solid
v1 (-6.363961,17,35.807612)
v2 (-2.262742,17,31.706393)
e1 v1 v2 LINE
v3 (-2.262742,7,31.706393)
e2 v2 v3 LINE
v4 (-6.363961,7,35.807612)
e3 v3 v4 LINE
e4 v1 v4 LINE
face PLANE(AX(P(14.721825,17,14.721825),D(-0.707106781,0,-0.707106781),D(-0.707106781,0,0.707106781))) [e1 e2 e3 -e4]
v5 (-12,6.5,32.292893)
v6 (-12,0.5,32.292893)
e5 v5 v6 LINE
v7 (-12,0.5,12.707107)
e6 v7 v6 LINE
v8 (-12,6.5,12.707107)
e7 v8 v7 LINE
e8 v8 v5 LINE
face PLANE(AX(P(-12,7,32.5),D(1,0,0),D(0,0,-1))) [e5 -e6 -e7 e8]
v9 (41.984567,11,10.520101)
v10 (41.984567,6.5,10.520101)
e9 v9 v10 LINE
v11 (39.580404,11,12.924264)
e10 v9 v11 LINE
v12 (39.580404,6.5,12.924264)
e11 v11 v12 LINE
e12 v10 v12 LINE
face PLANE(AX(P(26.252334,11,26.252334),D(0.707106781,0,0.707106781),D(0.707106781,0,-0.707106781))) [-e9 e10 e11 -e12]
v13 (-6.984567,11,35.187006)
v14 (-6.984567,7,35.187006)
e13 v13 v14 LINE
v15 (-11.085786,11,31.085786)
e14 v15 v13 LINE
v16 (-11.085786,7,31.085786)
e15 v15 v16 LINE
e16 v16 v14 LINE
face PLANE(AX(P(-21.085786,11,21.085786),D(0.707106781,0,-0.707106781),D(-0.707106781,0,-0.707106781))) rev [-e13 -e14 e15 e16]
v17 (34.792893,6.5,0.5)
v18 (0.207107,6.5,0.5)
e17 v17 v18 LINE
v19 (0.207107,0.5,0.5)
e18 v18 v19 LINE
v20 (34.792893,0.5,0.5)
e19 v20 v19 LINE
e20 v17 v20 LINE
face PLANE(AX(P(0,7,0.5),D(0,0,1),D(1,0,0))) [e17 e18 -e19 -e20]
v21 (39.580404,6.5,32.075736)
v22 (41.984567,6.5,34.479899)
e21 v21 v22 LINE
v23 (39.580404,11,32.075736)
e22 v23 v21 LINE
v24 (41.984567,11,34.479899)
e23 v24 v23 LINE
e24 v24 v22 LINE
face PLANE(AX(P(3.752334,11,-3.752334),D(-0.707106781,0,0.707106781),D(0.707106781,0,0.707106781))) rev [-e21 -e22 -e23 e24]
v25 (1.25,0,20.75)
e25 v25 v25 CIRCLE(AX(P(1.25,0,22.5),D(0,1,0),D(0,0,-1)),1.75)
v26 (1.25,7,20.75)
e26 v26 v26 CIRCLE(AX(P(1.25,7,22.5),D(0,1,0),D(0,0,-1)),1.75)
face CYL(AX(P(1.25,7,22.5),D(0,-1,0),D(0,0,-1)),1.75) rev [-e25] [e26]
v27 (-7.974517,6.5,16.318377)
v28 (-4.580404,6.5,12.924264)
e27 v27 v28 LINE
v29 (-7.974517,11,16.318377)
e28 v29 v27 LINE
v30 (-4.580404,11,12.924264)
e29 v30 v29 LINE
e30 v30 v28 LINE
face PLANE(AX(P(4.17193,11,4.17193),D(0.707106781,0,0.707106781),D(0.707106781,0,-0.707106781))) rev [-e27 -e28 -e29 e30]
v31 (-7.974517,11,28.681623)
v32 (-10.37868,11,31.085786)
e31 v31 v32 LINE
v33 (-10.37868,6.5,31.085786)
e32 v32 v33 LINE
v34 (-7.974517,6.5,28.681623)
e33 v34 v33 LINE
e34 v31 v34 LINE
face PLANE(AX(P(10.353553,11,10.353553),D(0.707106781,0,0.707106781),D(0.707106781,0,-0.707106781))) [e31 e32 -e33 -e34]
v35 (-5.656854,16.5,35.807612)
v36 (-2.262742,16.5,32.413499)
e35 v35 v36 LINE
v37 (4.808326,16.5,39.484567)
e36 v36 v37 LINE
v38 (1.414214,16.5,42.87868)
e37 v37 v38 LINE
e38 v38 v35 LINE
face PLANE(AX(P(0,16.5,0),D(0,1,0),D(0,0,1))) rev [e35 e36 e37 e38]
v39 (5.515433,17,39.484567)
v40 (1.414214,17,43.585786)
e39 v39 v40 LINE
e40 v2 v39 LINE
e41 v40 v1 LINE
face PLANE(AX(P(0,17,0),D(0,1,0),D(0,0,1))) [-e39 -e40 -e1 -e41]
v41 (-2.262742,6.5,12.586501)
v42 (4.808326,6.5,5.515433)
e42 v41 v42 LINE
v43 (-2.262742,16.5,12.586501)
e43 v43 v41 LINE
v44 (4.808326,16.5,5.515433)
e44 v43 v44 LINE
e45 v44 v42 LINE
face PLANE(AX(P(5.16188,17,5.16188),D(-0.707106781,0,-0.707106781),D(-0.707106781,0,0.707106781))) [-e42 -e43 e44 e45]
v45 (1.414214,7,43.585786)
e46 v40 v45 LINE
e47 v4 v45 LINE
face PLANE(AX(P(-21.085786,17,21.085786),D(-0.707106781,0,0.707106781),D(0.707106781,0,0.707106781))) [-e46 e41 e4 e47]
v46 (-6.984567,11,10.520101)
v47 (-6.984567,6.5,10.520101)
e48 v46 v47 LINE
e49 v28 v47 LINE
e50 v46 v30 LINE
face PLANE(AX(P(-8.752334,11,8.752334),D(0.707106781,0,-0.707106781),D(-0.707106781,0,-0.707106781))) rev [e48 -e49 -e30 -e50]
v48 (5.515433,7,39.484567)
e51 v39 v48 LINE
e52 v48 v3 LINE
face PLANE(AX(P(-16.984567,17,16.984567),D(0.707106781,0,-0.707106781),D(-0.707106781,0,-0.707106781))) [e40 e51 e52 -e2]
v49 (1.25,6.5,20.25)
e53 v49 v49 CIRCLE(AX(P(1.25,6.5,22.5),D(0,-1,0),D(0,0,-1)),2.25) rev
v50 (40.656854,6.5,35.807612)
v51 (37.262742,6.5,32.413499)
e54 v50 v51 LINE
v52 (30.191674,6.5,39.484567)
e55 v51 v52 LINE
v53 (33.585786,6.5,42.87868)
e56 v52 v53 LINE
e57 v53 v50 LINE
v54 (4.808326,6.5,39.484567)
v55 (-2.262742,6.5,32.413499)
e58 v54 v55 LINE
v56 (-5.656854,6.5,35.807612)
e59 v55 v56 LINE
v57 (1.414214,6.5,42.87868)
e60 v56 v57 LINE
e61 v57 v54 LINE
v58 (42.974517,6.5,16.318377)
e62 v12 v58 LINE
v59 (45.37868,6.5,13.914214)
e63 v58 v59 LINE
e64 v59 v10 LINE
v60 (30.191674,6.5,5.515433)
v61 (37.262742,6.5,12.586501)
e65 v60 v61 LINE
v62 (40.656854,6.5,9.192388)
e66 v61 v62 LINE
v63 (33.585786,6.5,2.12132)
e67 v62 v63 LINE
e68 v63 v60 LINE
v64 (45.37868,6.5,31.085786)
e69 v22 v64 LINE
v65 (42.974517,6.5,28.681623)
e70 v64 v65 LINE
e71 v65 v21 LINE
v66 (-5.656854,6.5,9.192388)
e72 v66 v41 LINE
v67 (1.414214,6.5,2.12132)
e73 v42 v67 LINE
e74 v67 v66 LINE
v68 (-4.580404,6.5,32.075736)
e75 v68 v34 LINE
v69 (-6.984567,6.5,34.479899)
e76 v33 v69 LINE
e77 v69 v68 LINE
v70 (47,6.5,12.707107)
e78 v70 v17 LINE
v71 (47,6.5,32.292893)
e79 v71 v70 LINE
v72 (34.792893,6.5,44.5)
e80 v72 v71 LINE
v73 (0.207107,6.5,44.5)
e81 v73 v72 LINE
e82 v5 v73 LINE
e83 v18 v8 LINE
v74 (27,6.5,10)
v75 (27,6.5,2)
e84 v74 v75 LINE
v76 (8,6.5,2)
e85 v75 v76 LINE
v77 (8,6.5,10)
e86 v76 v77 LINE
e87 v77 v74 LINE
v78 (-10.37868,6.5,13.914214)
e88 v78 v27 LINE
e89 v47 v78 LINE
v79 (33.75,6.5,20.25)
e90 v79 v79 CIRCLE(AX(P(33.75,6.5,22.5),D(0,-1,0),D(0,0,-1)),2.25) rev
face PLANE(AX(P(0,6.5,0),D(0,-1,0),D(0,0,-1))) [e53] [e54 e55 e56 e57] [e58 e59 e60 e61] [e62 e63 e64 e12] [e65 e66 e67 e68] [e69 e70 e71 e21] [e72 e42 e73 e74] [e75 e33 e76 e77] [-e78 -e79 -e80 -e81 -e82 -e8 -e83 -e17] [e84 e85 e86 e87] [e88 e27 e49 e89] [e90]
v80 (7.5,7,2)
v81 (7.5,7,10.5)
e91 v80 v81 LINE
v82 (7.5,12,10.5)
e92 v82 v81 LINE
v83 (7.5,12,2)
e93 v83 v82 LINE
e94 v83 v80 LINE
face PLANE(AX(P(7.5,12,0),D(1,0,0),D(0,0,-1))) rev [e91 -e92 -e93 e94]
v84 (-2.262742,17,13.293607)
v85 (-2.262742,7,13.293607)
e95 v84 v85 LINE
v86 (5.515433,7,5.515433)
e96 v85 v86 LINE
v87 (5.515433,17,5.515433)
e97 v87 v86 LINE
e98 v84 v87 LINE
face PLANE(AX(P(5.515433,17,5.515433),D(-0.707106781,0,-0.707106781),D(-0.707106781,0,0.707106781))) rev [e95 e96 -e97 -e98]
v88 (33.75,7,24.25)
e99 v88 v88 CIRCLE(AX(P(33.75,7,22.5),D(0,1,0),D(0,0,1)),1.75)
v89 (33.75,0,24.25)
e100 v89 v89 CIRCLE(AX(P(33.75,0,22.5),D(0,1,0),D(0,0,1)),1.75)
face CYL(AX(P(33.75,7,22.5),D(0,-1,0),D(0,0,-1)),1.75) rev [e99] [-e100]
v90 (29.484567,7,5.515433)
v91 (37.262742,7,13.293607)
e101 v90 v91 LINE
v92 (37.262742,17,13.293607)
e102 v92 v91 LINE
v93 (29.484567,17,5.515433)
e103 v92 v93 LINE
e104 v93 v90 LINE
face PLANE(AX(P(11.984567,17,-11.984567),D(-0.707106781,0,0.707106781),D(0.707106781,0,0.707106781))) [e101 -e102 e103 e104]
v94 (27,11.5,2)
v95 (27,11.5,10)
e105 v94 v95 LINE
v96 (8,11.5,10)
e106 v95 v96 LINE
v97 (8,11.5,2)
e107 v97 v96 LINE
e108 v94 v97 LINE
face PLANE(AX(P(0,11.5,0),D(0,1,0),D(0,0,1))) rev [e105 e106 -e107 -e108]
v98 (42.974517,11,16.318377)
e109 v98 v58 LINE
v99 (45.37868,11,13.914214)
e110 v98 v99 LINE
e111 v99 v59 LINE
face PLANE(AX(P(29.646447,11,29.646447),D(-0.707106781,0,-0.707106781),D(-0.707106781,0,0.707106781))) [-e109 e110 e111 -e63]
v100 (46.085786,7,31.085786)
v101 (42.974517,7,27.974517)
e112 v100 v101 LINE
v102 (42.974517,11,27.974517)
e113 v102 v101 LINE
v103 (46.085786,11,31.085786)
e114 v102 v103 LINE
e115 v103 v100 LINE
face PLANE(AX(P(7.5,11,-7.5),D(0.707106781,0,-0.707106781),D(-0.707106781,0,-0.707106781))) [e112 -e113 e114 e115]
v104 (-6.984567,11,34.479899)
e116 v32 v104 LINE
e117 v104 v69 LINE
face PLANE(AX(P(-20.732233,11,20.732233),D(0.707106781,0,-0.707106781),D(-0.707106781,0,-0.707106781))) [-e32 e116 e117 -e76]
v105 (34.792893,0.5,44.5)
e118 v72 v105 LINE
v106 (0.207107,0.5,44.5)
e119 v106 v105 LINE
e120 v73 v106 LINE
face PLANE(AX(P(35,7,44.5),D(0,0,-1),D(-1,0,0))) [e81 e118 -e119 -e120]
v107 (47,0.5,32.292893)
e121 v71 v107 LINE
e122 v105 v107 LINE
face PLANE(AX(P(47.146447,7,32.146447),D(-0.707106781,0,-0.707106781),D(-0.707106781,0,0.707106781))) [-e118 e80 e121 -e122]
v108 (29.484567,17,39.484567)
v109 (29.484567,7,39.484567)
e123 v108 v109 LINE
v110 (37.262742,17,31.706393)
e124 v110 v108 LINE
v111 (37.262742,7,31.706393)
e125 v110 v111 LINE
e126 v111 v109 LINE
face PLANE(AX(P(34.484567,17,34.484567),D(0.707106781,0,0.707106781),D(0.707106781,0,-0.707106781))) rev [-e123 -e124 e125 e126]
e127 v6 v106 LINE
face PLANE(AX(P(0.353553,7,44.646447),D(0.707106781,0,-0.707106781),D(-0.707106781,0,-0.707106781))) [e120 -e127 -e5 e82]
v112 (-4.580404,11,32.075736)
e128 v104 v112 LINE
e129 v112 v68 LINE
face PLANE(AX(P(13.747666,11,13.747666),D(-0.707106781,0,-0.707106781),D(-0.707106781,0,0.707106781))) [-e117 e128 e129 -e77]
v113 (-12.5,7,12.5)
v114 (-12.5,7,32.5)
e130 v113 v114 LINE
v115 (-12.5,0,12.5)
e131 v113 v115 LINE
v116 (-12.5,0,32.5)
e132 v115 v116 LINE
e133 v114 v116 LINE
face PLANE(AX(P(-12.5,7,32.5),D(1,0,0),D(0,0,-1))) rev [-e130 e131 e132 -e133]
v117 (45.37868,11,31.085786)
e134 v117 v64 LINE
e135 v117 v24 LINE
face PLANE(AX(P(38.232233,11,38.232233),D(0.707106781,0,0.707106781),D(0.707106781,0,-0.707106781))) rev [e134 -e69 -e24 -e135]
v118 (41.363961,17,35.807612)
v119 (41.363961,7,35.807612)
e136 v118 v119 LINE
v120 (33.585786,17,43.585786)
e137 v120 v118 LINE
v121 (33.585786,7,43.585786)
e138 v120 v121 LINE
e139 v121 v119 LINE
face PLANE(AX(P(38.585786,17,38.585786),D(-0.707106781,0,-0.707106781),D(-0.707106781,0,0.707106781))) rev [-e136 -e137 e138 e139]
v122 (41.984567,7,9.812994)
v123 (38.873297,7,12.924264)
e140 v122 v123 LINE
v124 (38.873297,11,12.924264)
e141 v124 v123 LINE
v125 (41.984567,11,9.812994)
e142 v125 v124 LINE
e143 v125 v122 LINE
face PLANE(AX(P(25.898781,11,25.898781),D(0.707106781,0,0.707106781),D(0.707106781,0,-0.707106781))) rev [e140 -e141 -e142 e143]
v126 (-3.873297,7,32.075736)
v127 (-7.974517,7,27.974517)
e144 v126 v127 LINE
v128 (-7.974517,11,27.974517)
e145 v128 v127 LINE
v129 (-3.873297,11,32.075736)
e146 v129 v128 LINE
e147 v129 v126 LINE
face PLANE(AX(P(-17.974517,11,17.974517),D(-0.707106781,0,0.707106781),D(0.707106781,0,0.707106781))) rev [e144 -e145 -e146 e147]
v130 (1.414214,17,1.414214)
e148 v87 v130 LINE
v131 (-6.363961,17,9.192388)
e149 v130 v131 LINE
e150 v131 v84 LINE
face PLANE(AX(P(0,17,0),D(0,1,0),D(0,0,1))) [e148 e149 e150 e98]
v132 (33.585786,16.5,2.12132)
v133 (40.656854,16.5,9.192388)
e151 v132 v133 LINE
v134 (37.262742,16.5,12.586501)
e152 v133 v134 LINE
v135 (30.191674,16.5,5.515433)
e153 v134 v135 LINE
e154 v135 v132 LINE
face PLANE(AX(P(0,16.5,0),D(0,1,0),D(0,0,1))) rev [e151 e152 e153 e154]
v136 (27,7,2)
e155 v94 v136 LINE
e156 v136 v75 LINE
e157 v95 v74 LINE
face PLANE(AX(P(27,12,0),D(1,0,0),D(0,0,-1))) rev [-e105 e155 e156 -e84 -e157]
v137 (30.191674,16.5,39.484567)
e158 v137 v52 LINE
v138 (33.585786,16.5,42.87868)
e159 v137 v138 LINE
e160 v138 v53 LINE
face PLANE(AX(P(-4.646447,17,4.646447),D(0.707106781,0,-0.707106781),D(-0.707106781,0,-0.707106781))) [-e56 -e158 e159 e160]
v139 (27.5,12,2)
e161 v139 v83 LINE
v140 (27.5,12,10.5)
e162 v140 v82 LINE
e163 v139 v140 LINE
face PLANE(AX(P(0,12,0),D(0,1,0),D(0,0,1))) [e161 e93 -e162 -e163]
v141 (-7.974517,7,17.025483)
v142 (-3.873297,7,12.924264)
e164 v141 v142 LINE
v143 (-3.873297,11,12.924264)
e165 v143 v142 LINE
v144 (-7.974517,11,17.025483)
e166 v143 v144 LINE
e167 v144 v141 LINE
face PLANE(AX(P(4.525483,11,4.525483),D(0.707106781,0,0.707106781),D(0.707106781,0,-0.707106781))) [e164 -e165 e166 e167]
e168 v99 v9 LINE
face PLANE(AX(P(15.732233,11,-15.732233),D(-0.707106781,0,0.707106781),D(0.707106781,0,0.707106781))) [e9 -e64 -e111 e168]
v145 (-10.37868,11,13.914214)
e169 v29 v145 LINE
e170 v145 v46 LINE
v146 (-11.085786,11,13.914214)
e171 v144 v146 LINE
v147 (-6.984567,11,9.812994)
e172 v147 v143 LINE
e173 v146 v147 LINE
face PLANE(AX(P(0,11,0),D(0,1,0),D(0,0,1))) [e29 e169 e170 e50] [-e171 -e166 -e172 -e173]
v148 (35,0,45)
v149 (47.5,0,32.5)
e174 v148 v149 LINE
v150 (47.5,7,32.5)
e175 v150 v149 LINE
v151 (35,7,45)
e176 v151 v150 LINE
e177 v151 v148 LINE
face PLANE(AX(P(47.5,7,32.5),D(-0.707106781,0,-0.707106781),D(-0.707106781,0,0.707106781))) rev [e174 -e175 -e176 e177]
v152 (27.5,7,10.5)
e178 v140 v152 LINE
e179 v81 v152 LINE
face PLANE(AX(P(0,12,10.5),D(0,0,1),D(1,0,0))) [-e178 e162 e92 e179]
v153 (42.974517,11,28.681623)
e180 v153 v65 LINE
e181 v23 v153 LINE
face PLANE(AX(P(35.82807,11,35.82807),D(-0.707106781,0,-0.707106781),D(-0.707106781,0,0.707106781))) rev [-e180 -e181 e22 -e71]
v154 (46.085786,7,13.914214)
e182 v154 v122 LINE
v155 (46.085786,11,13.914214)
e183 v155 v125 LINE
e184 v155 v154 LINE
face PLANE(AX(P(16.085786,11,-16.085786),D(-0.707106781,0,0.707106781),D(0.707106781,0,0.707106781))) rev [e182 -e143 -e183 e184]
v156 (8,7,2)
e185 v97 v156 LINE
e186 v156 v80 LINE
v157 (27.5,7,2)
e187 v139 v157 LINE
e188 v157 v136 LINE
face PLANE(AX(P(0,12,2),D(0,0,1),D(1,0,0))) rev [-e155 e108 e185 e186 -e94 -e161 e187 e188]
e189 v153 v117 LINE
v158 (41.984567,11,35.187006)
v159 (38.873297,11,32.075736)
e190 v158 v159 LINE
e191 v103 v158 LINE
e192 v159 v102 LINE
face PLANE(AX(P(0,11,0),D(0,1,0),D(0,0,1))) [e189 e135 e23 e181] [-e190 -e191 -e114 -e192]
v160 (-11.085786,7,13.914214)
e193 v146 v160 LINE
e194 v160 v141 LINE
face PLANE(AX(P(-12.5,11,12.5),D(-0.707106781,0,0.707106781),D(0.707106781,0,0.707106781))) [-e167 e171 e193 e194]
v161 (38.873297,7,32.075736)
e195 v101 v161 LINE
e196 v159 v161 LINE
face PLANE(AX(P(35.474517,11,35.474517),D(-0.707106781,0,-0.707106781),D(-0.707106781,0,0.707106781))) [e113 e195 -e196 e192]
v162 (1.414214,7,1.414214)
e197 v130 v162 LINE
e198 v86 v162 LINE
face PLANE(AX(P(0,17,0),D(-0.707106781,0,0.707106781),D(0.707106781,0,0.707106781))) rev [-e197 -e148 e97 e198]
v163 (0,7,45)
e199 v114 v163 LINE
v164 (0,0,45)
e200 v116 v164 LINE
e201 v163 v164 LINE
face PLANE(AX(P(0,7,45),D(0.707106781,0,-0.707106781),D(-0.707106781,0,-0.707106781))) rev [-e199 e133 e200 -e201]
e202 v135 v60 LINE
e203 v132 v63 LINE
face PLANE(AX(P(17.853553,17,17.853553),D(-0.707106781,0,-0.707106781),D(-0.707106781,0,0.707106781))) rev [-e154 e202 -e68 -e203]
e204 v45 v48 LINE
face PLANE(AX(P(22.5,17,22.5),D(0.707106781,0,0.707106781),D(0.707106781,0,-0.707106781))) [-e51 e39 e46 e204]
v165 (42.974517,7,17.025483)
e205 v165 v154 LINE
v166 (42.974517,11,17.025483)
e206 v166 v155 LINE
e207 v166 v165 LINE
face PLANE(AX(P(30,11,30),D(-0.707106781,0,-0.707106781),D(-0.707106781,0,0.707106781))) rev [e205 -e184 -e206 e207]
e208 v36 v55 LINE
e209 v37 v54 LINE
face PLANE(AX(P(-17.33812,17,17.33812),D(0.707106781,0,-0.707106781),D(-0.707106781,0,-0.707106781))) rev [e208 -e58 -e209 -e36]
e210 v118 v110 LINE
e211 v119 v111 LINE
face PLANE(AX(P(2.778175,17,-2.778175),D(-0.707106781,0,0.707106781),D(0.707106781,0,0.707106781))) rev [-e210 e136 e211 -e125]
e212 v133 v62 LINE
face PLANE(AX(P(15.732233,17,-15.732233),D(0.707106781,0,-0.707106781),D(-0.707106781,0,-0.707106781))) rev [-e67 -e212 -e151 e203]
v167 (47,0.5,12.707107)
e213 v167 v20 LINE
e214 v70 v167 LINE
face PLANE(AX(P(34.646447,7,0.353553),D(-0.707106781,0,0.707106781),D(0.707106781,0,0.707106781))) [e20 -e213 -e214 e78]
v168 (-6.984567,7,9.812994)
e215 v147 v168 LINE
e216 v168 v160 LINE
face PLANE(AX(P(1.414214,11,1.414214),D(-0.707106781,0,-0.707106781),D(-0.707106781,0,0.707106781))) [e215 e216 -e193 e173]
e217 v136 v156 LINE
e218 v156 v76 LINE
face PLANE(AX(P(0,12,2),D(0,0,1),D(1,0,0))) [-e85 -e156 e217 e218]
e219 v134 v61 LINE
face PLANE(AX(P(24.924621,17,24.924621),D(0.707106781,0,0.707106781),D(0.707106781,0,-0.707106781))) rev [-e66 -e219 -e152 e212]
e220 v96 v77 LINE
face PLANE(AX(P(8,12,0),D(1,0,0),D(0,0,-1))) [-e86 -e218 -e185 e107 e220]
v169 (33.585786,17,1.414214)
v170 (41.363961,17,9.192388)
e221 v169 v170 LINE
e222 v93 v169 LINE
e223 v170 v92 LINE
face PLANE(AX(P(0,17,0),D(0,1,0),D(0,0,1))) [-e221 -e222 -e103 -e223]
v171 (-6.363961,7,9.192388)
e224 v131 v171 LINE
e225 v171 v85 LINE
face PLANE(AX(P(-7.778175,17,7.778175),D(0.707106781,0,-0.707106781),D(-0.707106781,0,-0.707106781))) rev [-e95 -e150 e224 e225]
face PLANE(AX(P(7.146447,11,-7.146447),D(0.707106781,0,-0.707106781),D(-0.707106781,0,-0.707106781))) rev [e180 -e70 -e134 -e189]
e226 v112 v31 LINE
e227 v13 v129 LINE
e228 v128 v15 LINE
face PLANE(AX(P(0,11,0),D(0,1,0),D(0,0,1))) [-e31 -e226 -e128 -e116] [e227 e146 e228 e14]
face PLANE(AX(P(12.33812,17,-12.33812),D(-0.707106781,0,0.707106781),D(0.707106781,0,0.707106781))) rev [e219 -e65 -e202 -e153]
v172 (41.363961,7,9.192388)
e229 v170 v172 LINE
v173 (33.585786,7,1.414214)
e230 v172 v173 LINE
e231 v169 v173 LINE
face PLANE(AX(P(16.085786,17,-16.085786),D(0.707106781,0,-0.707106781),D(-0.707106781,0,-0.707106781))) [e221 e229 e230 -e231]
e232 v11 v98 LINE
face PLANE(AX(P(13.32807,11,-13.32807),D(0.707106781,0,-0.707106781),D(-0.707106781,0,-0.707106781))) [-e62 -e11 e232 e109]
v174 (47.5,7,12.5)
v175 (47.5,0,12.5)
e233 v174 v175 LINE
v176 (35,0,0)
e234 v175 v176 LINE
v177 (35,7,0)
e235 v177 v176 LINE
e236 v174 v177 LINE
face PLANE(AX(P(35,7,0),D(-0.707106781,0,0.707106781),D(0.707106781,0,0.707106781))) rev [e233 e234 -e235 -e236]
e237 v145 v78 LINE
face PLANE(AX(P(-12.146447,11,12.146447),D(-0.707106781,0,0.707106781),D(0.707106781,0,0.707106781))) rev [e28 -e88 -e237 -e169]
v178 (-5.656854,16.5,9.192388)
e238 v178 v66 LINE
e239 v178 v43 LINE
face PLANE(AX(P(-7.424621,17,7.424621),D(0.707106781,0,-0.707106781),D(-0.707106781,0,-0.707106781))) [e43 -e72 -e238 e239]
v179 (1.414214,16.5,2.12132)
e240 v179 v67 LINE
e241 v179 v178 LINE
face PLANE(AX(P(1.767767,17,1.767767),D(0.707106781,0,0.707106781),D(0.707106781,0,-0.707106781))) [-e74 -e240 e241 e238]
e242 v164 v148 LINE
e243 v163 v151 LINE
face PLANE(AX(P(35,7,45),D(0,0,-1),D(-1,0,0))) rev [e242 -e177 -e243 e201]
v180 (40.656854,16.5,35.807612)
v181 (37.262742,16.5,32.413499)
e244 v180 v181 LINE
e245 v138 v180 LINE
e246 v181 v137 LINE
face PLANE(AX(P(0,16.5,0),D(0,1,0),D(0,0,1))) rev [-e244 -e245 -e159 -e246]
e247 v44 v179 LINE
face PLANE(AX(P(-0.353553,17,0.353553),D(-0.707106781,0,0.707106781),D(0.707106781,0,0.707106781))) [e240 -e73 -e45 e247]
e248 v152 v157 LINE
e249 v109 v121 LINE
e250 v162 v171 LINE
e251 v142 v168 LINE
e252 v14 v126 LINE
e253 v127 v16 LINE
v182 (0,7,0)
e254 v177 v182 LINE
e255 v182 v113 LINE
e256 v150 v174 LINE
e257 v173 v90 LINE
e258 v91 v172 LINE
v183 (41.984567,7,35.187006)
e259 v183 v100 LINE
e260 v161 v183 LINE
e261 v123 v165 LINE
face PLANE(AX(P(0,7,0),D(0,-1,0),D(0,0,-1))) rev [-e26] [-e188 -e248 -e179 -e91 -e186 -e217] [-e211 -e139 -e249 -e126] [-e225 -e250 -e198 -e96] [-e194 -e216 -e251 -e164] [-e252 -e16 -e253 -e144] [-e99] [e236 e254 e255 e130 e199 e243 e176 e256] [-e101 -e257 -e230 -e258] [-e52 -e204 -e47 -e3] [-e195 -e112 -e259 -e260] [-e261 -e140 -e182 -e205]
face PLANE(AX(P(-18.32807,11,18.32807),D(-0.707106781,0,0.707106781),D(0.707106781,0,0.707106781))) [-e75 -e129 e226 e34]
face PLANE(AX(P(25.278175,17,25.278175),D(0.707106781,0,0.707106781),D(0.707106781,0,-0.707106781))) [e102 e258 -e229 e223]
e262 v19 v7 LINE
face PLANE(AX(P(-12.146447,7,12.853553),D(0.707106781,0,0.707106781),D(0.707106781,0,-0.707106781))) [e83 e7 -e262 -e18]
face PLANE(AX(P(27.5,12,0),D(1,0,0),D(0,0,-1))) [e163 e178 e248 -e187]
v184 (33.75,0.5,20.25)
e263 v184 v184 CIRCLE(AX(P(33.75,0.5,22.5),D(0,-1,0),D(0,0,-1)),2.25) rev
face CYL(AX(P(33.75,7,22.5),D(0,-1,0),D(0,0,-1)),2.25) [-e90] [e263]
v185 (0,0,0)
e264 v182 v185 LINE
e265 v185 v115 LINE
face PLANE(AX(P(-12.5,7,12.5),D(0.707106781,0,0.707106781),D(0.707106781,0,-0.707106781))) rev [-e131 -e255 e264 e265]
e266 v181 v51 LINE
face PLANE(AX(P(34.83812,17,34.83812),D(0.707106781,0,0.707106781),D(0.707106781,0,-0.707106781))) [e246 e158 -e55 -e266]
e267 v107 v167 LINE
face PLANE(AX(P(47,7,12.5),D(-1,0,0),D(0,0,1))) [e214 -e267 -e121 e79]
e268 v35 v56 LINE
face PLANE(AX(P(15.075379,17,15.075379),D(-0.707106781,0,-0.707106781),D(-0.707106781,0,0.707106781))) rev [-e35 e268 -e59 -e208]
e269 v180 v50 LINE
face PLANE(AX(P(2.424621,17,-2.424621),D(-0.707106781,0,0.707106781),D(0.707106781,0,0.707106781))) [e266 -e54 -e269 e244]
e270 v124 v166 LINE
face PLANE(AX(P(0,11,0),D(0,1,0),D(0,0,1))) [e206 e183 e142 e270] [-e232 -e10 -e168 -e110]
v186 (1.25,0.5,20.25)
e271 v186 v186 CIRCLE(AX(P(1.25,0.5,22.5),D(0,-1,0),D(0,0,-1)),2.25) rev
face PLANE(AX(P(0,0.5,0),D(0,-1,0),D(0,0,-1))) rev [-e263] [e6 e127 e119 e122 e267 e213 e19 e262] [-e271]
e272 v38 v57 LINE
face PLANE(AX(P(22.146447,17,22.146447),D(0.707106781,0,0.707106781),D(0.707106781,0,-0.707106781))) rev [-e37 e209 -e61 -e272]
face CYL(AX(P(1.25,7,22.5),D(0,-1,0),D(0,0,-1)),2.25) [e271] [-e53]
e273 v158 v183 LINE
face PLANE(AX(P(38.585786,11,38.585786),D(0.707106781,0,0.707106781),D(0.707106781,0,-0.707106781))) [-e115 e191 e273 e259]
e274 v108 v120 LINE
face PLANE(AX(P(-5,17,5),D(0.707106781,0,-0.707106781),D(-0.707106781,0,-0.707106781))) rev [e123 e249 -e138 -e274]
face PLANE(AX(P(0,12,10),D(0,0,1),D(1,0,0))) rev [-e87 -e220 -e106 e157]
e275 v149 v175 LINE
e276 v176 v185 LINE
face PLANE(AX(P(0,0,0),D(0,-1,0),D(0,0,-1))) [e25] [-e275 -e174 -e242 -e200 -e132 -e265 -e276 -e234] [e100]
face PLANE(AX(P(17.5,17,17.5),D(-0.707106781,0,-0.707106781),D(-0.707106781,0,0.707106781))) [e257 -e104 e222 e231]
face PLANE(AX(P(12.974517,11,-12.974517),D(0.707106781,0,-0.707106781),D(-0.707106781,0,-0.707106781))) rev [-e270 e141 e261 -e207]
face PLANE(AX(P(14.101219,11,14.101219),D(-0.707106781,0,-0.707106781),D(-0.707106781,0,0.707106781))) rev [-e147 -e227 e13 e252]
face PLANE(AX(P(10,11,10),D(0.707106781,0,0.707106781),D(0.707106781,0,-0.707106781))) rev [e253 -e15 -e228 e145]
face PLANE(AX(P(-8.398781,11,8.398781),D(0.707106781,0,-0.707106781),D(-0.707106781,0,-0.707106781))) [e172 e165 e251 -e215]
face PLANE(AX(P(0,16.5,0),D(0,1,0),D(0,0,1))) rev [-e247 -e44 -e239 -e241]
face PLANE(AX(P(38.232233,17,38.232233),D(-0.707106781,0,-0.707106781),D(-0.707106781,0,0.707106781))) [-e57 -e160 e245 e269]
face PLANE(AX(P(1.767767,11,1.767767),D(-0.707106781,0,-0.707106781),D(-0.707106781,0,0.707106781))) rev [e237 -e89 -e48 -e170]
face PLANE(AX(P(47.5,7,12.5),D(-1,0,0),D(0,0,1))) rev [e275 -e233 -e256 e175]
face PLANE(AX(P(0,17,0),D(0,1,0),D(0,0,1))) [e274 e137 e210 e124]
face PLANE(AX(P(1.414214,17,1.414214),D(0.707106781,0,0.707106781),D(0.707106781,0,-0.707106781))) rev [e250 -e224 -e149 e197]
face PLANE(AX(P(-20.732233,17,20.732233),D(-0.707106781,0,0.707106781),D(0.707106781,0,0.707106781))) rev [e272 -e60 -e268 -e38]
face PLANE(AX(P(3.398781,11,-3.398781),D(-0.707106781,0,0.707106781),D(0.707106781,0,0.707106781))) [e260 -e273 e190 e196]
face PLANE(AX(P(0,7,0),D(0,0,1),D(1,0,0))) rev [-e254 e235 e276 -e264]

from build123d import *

# Parameters (mm, degrees)
SKETCH_1_R          = 1.75
SKETCH_1_W          = 20
SKETCH_1_H          = 8.5
EXTRUDE_1_DEPTH     = 7
EXTRUDE_2_DEPTH     = 17
EXTRUDE_3_DEPTH     = 11
SKETCH_1_4_W        = 20
SKETCH_1_4_H        = 8.5
EXTRUDE_4_DEPTH     = 12
SHELL_START         = 0.5
SHELL_4_OUTLINE_R   = 2.25
SHELL_4_DEPTH       = 6
SHELL_START_2       = 6.5
SHELL_4_2_DEPTH     = 10
SHELL_4_3_OUTLINE_W = 19
SHELL_4_3_OUTLINE_H = 8
SHELL_4_3_DEPTH     = 5


# Read off the part's stored shape, not the designer's step: 抽壳4
with BuildPart() as part:
    # 草图1 → 凸台-拉伸1 (new body)
    with BuildSketch(Plane(origin=(0, 0, 0), x_dir=(1, 0, 0), z_dir=(0, 1, 0))):
        Polygon((0, 0), (35, 0), (47.5, -12.5), (47.5, -32.5), (35, -45), (0, -45), (-12.5, -32.5), (-12.5, -12.5), align=None)
        with Locations(Location((33.75, -22.5, 0), (0, 0, 270))):
            Circle(SKETCH_1_R, mode=Mode.SUBTRACT)
        with Locations(Location((1.25, -22.5, 0), (0, 0, 90))):
            Circle(SKETCH_1_R, mode=Mode.SUBTRACT)
        Polygon((33.585786438, -43.585786438), (41.363961031, -35.807611845), (37.2627417, -31.706392514), (29.484567107, -39.484567107), align=None, mode=Mode.SUBTRACT)
        Polygon((46.085786438, -31.085786438), (41.984567107, -35.187005769), (38.87329727, -32.075735931), (42.9745166, -27.9745166), align=None, mode=Mode.SUBTRACT)
        Polygon((33.585786438, -1.414213562), (41.363961031, -9.192388155), (37.2627417, -13.293607486), (29.484567107, -5.515432893), align=None, mode=Mode.SUBTRACT)
        Polygon((46.085786438, -13.914213562), (41.984567107, -9.812994231), (38.87329727, -12.924264069), (42.9745166, -17.0254834), align=None, mode=Mode.SUBTRACT)
        Polygon((-7.9745166, -17.0254834), (-11.085786438, -13.914213562), (-6.984567107, -9.812994231), (-3.87329727, -12.924264069), align=None, mode=Mode.SUBTRACT)
        Polygon((5.515432893, -5.515432893), (1.414213562, -1.414213562), (-6.363961031, -9.192388155), (-2.2627417, -13.293607486), align=None, mode=Mode.SUBTRACT)
        Polygon((-11.085786438, -31.085786438), (-6.984567107, -35.187005769), (-3.87329727, -32.075735931), (-7.9745166, -27.9745166), align=None, mode=Mode.SUBTRACT)
        Polygon((-6.363961031, -35.807611845), (-2.2627417, -31.706392514), (5.515432893, -39.484567107), (1.414213562, -43.585786438), align=None, mode=Mode.SUBTRACT)
        with Locations((17.5, -6.25)):
            Rectangle(SKETCH_1_W, SKETCH_1_H, mode=Mode.SUBTRACT)
    extrude(amount=EXTRUDE_1_DEPTH)

    # 草图1<2> → 凸台-拉伸2 (add)
    with BuildSketch(Plane(origin=(0, 0, 0), x_dir=(1, 0, 0), z_dir=(0, 1, 0))):
        Polygon((37.2627417, -13.293607486), (29.484567107, -5.515432893), (33.585786438, -1.414213562), (41.363961031, -9.192388155), align=None)
        Polygon((-6.363961031, -9.192388155), (-2.2627417, -13.293607486), (5.515432893, -5.515432893), (1.414213562, -1.414213562), align=None)
        Polygon((-2.2627417, -31.706392514), (5.515432893, -39.484567107), (1.414213562, -43.585786438), (-6.363961031, -35.807611845), align=None)
        Polygon((37.2627417, -31.706392514), (29.484567107, -39.484567107), (33.585786438, -43.585786438), (41.363961031, -35.807611845), align=None)
    extrude(amount=EXTRUDE_2_DEPTH)

    # 草图1<3> → 凸台-拉伸3 (add)
    with BuildSketch(Plane(origin=(0, 0, 0), x_dir=(1, 0, 0), z_dir=(0, 1, 0))):
        Polygon((-11.085786438, -31.085786438), (-6.984567107, -35.187005769), (-3.87329727, -32.075735931), (-7.9745166, -27.9745166), align=None)
        Polygon((42.9745166, -27.9745166), (46.085786438, -31.085786438), (41.984567107, -35.187005769), (38.87329727, -32.075735931), align=None)
        Polygon((41.984567107, -9.812994231), (38.87329727, -12.924264069), (42.9745166, -17.0254834), (46.085786438, -13.914213562), align=None)
        Polygon((-6.984567107, -9.812994231), (-3.87329727, -12.924264069), (-7.9745166, -17.0254834), (-11.085786438, -13.914213562), align=None)
    extrude(amount=EXTRUDE_3_DEPTH)

    # 草图1<4> → 凸台-拉伸4 (add)
    with BuildSketch(Plane(origin=(0, 0, 0), x_dir=(1, 0, 0), z_dir=(0, 1, 0))):
        with Locations((17.5, -6.25)):
            Rectangle(SKETCH_1_4_W, SKETCH_1_4_H)
    extrude(amount=EXTRUDE_4_DEPTH)

    # 抽壳4 outline → 抽壳4 (cut)
    with BuildSketch(Plane(origin=(0, 0, 0), x_dir=(1, 0, 0), z_dir=(0, 1, 0)).offset(SHELL_START)):
        Polygon((0.207106781, -0.5), (-12, -12.707106781), (-12, -32.292893219), (0.207106781, -44.5), (34.792893219, -44.5), (47, -32.292893219), (47, -12.707106781), (34.792893219, -0.5), align=None)
        with Locations((1.25, -22.5)):
            Circle(SHELL_4_OUTLINE_R, mode=Mode.SUBTRACT)
        with Locations((33.75, -22.5)):
            Circle(SHELL_4_OUTLINE_R, mode=Mode.SUBTRACT)
    extrude(amount=SHELL_4_DEPTH, mode=Mode.SUBTRACT)

    # Shell 4 2 outline → Shell 4 2 (cut)
    with BuildSketch(Plane(origin=(0, 0, 0), x_dir=(1, 0, 0), z_dir=(0, 1, 0)).offset(SHELL_START_2)):
        Polygon((33.585786438, -2.121320344), (30.191673888, -5.515432893), (37.2627417, -12.586500705), (40.656854249, -9.192388155), align=None)
        Polygon((45.378679656, -13.914213562), (41.984567107, -10.520101013), (39.580404051, -12.924264069), (42.9745166, -16.318376618), align=None)
        Polygon((-5.656854249, -9.192388155), (-2.2627417, -12.586500705), (4.808326112, -5.515432893), (1.414213562, -2.121320344), align=None)
        Polygon((-4.580404051, -12.924264069), (-6.984567107, -10.520101013), (-10.378679656, -13.914213562), (-7.9745166, -16.318376618), align=None)
        Polygon((4.808326112, -39.484567107), (-2.2627417, -32.413499295), (-5.656854249, -35.807611845), (1.414213562, -42.878679656), align=None)
        Polygon((-10.378679656, -31.085786438), (-6.984567107, -34.479898987), (-4.580404051, -32.075735931), (-7.9745166, -28.681623382), align=None)
        Polygon((37.2627417, -32.413499295), (30.191673888, -39.484567107), (33.585786438, -42.878679656), (40.656854249, -35.807611845), align=None)
        Polygon((39.580404051, -32.075735931), (41.984567107, -34.479898987), (45.378679656, -31.085786438), (42.9745166, -28.681623382), align=None)
    extrude(amount=SHELL_4_2_DEPTH, mode=Mode.SUBTRACT)

    # Shell 4 3 outline → Shell 4 3 (cut)
    with BuildSketch(Plane(origin=(0, 0, 0), x_dir=(1, 0, 0), z_dir=(0, 1, 0)).offset(SHELL_START_2)):
        with Locations((17.5, -6)):
            Rectangle(SHELL_4_3_OUTLINE_W, SHELL_4_3_OUTLINE_H)
    extrude(amount=SHELL_4_3_DEPTH, mode=Mode.SUBTRACT)


solid = part.part
